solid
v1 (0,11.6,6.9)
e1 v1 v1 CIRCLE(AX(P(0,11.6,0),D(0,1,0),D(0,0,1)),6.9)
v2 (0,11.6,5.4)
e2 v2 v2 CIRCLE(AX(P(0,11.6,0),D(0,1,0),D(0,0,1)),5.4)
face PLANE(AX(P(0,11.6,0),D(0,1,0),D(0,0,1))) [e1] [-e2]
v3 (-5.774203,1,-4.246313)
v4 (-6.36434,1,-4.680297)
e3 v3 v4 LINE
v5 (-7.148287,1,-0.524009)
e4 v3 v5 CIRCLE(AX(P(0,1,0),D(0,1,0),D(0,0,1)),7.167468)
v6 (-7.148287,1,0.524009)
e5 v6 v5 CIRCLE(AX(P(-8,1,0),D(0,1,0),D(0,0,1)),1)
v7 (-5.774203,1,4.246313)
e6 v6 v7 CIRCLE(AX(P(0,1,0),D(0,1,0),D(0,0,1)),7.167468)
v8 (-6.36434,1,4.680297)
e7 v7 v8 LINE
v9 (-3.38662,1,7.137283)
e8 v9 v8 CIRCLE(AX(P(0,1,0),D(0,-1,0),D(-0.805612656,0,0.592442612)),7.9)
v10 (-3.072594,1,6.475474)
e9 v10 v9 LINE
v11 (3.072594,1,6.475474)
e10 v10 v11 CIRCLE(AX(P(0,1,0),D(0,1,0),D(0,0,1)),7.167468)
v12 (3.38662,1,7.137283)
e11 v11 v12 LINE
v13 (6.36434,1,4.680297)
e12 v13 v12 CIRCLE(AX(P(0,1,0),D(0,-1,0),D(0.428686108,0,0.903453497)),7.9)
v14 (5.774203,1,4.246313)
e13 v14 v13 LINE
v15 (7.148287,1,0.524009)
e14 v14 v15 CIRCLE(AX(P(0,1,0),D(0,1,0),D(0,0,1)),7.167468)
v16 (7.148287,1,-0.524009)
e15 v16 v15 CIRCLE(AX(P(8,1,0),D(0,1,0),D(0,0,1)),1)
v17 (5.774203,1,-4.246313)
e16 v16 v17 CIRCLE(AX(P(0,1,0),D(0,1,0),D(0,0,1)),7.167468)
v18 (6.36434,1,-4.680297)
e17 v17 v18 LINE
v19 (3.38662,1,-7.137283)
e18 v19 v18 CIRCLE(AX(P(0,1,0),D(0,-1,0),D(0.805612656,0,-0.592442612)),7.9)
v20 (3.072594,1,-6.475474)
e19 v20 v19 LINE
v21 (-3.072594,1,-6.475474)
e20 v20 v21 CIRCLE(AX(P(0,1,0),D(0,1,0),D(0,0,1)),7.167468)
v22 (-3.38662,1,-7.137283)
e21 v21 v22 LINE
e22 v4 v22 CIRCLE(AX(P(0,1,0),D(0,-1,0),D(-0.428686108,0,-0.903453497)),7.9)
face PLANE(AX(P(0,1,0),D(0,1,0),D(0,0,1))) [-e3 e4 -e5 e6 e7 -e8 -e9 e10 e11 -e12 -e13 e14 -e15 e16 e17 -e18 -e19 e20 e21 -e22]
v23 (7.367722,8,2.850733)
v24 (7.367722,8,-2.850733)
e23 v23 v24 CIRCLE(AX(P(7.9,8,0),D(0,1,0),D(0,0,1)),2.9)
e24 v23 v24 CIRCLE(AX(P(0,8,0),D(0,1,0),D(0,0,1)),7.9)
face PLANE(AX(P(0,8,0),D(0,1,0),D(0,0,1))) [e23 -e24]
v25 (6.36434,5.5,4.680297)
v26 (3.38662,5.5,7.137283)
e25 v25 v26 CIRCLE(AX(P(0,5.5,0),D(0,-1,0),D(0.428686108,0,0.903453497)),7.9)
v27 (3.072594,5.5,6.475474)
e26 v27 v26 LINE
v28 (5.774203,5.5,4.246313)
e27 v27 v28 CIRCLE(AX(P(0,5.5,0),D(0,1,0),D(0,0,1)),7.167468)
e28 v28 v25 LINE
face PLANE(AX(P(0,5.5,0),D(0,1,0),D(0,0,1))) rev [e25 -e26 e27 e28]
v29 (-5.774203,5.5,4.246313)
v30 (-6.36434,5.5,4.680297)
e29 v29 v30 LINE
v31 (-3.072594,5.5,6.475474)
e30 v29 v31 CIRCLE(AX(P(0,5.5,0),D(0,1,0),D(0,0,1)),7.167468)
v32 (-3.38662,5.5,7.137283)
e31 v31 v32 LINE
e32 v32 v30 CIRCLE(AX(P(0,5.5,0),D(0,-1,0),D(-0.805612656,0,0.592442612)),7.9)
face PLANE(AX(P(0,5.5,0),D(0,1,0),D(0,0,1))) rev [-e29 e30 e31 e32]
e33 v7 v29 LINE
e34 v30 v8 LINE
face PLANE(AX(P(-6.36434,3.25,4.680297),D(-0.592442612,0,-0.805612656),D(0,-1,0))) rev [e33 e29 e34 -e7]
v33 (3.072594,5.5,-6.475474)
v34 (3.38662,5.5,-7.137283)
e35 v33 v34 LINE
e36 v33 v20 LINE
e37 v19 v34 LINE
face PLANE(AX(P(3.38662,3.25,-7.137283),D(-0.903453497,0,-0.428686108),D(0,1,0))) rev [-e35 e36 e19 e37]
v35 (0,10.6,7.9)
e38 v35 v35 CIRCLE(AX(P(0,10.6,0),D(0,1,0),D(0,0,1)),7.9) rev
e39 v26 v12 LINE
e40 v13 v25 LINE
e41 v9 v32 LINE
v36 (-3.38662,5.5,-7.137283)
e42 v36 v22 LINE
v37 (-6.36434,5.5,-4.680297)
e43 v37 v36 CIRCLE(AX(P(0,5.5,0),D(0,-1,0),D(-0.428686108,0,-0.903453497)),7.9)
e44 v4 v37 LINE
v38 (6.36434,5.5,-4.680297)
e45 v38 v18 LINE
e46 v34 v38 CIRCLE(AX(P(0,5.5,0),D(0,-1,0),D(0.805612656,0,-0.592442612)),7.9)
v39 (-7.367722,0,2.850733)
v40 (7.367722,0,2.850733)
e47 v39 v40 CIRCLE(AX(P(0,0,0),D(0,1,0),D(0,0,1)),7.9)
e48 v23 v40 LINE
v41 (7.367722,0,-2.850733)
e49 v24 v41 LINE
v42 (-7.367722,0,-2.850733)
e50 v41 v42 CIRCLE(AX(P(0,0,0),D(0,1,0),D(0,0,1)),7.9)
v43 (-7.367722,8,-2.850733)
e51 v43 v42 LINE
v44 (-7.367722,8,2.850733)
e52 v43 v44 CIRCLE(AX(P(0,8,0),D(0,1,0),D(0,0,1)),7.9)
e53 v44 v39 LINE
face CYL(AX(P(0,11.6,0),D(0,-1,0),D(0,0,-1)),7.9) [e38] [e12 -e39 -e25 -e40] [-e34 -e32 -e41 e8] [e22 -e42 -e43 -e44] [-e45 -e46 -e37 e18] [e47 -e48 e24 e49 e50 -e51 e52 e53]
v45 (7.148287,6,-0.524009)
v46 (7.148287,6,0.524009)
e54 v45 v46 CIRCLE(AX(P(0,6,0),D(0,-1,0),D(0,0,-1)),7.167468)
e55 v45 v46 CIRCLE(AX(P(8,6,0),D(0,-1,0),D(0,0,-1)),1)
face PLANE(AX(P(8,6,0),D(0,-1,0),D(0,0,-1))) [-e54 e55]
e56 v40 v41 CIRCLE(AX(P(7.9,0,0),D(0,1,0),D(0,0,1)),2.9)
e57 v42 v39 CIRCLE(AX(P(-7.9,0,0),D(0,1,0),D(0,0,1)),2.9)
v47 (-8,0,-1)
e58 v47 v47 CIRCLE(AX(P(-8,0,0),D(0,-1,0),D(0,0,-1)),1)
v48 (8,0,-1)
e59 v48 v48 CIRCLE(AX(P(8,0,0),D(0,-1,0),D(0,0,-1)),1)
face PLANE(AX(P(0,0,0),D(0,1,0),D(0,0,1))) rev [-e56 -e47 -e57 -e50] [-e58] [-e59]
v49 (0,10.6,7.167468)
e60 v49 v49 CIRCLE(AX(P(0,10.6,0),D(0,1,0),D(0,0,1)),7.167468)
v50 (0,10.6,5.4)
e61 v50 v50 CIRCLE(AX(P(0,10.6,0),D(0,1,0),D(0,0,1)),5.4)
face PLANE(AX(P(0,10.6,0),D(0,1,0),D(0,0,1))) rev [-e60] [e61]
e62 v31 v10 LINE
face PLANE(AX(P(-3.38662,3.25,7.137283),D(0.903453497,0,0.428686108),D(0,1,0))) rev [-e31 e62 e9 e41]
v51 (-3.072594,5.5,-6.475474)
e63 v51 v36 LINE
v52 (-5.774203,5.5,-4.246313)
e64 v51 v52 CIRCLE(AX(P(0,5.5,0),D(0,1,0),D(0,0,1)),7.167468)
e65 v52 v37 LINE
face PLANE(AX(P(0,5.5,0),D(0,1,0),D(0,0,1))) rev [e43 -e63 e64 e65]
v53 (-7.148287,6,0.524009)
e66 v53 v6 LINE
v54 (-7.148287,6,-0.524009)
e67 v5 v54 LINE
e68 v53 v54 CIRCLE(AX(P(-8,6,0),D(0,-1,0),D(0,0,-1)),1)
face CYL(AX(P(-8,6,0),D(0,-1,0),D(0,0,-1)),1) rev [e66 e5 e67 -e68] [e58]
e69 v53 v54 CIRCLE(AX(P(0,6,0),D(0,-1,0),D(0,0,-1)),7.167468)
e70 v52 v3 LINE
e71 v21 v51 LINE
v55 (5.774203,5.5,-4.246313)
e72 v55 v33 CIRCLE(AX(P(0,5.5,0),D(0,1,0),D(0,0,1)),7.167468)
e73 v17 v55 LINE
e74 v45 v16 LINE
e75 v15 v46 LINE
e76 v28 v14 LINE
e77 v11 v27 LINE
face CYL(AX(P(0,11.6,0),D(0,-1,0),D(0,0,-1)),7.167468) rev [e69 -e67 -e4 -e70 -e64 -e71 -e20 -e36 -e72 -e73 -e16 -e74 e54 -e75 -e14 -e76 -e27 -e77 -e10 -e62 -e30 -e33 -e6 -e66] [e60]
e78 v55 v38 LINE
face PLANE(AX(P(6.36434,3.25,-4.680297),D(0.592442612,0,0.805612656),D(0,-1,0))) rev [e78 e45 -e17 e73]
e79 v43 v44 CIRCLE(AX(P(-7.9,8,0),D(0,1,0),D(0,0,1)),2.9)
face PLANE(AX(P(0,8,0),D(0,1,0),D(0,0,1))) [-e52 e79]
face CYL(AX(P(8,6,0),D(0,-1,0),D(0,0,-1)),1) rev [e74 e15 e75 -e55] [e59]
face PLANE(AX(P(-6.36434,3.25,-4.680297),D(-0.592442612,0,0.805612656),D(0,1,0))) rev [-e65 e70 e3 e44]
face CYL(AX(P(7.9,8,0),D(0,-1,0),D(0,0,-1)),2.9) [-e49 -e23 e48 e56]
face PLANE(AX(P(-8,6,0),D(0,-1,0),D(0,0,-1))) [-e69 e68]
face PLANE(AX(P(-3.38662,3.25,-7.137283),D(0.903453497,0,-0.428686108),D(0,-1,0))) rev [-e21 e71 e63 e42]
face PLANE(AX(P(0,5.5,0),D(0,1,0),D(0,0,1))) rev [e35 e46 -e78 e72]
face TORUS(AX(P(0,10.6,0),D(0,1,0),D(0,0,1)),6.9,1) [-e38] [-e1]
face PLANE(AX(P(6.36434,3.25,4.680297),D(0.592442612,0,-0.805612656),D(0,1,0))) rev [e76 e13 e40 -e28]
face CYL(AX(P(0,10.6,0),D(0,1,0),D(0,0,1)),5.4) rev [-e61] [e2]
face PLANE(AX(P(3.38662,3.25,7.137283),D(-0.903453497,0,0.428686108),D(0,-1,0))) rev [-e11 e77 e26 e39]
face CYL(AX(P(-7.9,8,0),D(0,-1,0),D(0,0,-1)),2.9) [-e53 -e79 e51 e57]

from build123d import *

# Parameters (mm, degrees)
BOSS_EXTRUDE1_DEPTH      = 11.6
BOSS_EXTRUDE2_DEPTH      = 8
SKETCH2_R                = 7.167468034
BOSS_EXTRUDE3_DEPTH      = 1
BOSS_EXTRUDE4_START      = -1
SKETCH3_R                = 7.167468034
SKETCH3_R_2              = 5.4
BOSS_EXTRUDE4_DEPTH      = 1
FILLET1_R                = 1
WRAP1_SECTION_W          = 3
WRAP1_SECTION_H          = 4.5
WRAP1_ANGLE              = 28.285258241
WRAP1_SECTOR_2_SECTION_W = 3
WRAP1_SECTOR_2_SECTION_H = 4.5
WRAP1_SECTOR_2_ANGLE     = 28.285258241
WRAP2_START              = 1
WRAP2_DEPTH              = 4.5
SKETCH6_R                = 1
CUT_EXTRUDE1_DEPTH       = 6


# Read off the part's stored shape, not the designer's step: Wrap2
with BuildPart() as part:
    # Sketch1 → Boss-Extrude1 (new body)
    with BuildSketch(Plane(origin=(0, 0, 0), x_dir=(1, 0, 0), z_dir=(0, 1, 0))):
        with BuildLine():
            ThreePointArc((-7.167468034, 0), (0, 7.167468034), (7.167468034, 0))
            Line((7.167468034, 0), (7.9, 0))
            ThreePointArc((7.9, 0), (7.765790365, 1.45), (7.367721519, 2.850733172))
            ThreePointArc((7.367721519, 2.850733172), (0, 7.9), (-7.367721519, 2.850733172))
            ThreePointArc((-7.367721519, 2.850733172), (-7.765790365, 1.45), (-7.9, 0))
            Line((-7.9, 0), (-7.167468034, 0))
        make_face()
        with BuildLine():
            Line((7.9, 0), (7.167468034, 0))
            ThreePointArc((7.167468034, 0), (0, -7.167468034), (-7.167468034, 0))
            Line((-7.167468034, 0), (-7.9, 0))
            ThreePointArc((-7.9, 0), (-7.765790365, -1.45), (-7.367721519, -2.850733172))
            ThreePointArc((-7.367721519, -2.850733172), (0, -7.9), (7.367721519, -2.850733172))
            ThreePointArc((7.367721519, -2.850733172), (7.765790365, -1.45), (7.9, 0))
        make_face()
    extrude(amount=BOSS_EXTRUDE1_DEPTH)

    # Sketch1<3> → Boss-Extrude2 (add)
    with BuildSketch(Plane(origin=(0, 0, 0), x_dir=(1, 0, 0), z_dir=(0, 1, 0))):
        with BuildLine():
            ThreePointArc((-7.367721519, -2.850733172), (-7.765790365, -1.45), (-7.9, 0))
            Line((-7.9, 0), (-10.8, 0))
            ThreePointArc((-10.8, 0), (-9.75288861, -2.230875119), (-7.367721519, -2.850733172))
        make_face()
        with BuildLine():
            Line((-10.8, 0), (-7.9, 0))
            ThreePointArc((-7.9, 0), (-7.765790365, 1.45), (-7.367721519, 2.850733172))
            ThreePointArc((-7.367721519, 2.850733172), (-9.75288861, 2.230875119), (-10.8, 0))
        make_face()
        with BuildLine():
            ThreePointArc((7.367721519, 2.850733172), (7.765790365, 1.45), (7.9, 0))
            Line((7.9, 0), (10.8, 0))
            ThreePointArc((10.8, 0), (9.75288861, 2.230875119), (7.367721519, 2.850733172))
        make_face()
        with BuildLine():
            Line((10.8, 0), (7.9, 0))
            ThreePointArc((7.9, 0), (7.765790365, -1.45), (7.367721519, -2.850733172))
            ThreePointArc((7.367721519, -2.850733172), (9.75288861, -2.230875119), (10.8, 0))
        make_face()
    extrude(amount=BOSS_EXTRUDE2_DEPTH)

    # Sketch2 → Boss-Extrude3 (add)
    with BuildSketch(Plane(origin=(0, 0, 0), x_dir=(1, 0, 0), z_dir=(0, 1, 0))):
        with Locations(Location((0, 0, 0), (0, 0, 270))):
            Circle(SKETCH2_R)
    extrude(amount=BOSS_EXTRUDE3_DEPTH)

    # Sketch3 → Boss-Extrude4 (add)
    with BuildSketch(Plane(origin=(0, 11.6, 0), x_dir=(1, 0, 0), z_dir=(0, 1, 0)).offset(BOSS_EXTRUDE4_START)):
        with Locations(Location((0, 0, 0), (0, 0, 270))):
            Circle(SKETCH3_R)
        with Locations(Location((0, 0, 0), (0, 0, 270))):
            Circle(SKETCH3_R_2, mode=Mode.SUBTRACT)
    extrude(amount=BOSS_EXTRUDE4_DEPTH)

    # Fillet1
    fillet1_edges = [part.edges().sort_by_distance(p)[0] for p in [
        (7.9, 11.6, 0),
    ]]
    fillet(fillet1_edges, radius=FILLET1_R)

    # Wrap1 section (on wrap section) → Wrap1 (revolve, cut)
    with BuildSketch(Plane(origin=(0, 0, 0), x_dir=(-0.8056126558283049, 0, -0.5924426122159557), z_dir=(-0.5924426122159557, 0, 0.8056126558283049))):
        with Locations((6.4, -3.25)):
            Rectangle(WRAP1_SECTION_W, WRAP1_SECTION_H)
    revolve(axis=Axis((0, 0, 0), (0, -1, 0)), revolution_arc=WRAP1_ANGLE, mode=Mode.SUBTRACT)

    # Wrap1 sector 2 section (on wrap section) → Wrap1 sector 2 (revolve, cut)
    with BuildSketch(Plane(origin=(0, 0, 0), x_dir=(0.4286861079278577, 0, -0.9034534967941986), z_dir=(-0.9034534967941986, 0, -0.4286861079278577))):
        with Locations((6.4, -3.25)):
            Rectangle(WRAP1_SECTOR_2_SECTION_W, WRAP1_SECTOR_2_SECTION_H)
    revolve(axis=Axis((0, 0, 0), (0, -1, 0)), revolution_arc=WRAP1_SECTOR_2_ANGLE, mode=Mode.SUBTRACT)

    # Wrap2 outline → Wrap2 (cut)
    with BuildSketch(Plane(origin=(0, 0, 0), x_dir=(1, 0, 0), z_dir=(0, 1, 0)).offset(WRAP2_START)):
        with BuildLine():
            ThreePointArc((5.774202958, -4.246313485), (4.561660138, -5.528458629), (3.072593975, -6.475474058))
            Line((3.072593975, -6.475474058), (3.386620253, -7.137282625))
            ThreePointArc((3.386620253, -7.137282625), (5.027872453, -6.093480007), (6.364339981, -4.680296637))
            Line((6.364339981, -4.680296637), (5.774202958, -4.246313485))
        make_face()
        with BuildLine():
            Line((-3.386620253, -7.137282625), (-3.072593975, -6.475474058))
            ThreePointArc((-3.072593975, -6.475474058), (-4.561660138, -5.528458629), (-5.774202958, -4.246313485))
            Line((-5.774202958, -4.246313485), (-6.364339981, -4.680296637))
            ThreePointArc((-6.364339981, -4.680296637), (-5.027872453, -6.093480007), (-3.386620253, -7.137282625))
        make_face()
    extrude(amount=WRAP2_DEPTH, mode=Mode.SUBTRACT)

    # Sketch6 → Cut-Extrude1 (cut)
    with BuildSketch(Plane.XZ):
        with Locations(Location((-8, 0, 0), (0, 0, 270))):
            Circle(SKETCH6_R)
        with Locations(Location((8, 0, 0), (0, 0, 270))):
            Circle(SKETCH6_R)
    extrude(amount=-CUT_EXTRUDE1_DEPTH, mode=Mode.SUBTRACT)


solid = part.part
